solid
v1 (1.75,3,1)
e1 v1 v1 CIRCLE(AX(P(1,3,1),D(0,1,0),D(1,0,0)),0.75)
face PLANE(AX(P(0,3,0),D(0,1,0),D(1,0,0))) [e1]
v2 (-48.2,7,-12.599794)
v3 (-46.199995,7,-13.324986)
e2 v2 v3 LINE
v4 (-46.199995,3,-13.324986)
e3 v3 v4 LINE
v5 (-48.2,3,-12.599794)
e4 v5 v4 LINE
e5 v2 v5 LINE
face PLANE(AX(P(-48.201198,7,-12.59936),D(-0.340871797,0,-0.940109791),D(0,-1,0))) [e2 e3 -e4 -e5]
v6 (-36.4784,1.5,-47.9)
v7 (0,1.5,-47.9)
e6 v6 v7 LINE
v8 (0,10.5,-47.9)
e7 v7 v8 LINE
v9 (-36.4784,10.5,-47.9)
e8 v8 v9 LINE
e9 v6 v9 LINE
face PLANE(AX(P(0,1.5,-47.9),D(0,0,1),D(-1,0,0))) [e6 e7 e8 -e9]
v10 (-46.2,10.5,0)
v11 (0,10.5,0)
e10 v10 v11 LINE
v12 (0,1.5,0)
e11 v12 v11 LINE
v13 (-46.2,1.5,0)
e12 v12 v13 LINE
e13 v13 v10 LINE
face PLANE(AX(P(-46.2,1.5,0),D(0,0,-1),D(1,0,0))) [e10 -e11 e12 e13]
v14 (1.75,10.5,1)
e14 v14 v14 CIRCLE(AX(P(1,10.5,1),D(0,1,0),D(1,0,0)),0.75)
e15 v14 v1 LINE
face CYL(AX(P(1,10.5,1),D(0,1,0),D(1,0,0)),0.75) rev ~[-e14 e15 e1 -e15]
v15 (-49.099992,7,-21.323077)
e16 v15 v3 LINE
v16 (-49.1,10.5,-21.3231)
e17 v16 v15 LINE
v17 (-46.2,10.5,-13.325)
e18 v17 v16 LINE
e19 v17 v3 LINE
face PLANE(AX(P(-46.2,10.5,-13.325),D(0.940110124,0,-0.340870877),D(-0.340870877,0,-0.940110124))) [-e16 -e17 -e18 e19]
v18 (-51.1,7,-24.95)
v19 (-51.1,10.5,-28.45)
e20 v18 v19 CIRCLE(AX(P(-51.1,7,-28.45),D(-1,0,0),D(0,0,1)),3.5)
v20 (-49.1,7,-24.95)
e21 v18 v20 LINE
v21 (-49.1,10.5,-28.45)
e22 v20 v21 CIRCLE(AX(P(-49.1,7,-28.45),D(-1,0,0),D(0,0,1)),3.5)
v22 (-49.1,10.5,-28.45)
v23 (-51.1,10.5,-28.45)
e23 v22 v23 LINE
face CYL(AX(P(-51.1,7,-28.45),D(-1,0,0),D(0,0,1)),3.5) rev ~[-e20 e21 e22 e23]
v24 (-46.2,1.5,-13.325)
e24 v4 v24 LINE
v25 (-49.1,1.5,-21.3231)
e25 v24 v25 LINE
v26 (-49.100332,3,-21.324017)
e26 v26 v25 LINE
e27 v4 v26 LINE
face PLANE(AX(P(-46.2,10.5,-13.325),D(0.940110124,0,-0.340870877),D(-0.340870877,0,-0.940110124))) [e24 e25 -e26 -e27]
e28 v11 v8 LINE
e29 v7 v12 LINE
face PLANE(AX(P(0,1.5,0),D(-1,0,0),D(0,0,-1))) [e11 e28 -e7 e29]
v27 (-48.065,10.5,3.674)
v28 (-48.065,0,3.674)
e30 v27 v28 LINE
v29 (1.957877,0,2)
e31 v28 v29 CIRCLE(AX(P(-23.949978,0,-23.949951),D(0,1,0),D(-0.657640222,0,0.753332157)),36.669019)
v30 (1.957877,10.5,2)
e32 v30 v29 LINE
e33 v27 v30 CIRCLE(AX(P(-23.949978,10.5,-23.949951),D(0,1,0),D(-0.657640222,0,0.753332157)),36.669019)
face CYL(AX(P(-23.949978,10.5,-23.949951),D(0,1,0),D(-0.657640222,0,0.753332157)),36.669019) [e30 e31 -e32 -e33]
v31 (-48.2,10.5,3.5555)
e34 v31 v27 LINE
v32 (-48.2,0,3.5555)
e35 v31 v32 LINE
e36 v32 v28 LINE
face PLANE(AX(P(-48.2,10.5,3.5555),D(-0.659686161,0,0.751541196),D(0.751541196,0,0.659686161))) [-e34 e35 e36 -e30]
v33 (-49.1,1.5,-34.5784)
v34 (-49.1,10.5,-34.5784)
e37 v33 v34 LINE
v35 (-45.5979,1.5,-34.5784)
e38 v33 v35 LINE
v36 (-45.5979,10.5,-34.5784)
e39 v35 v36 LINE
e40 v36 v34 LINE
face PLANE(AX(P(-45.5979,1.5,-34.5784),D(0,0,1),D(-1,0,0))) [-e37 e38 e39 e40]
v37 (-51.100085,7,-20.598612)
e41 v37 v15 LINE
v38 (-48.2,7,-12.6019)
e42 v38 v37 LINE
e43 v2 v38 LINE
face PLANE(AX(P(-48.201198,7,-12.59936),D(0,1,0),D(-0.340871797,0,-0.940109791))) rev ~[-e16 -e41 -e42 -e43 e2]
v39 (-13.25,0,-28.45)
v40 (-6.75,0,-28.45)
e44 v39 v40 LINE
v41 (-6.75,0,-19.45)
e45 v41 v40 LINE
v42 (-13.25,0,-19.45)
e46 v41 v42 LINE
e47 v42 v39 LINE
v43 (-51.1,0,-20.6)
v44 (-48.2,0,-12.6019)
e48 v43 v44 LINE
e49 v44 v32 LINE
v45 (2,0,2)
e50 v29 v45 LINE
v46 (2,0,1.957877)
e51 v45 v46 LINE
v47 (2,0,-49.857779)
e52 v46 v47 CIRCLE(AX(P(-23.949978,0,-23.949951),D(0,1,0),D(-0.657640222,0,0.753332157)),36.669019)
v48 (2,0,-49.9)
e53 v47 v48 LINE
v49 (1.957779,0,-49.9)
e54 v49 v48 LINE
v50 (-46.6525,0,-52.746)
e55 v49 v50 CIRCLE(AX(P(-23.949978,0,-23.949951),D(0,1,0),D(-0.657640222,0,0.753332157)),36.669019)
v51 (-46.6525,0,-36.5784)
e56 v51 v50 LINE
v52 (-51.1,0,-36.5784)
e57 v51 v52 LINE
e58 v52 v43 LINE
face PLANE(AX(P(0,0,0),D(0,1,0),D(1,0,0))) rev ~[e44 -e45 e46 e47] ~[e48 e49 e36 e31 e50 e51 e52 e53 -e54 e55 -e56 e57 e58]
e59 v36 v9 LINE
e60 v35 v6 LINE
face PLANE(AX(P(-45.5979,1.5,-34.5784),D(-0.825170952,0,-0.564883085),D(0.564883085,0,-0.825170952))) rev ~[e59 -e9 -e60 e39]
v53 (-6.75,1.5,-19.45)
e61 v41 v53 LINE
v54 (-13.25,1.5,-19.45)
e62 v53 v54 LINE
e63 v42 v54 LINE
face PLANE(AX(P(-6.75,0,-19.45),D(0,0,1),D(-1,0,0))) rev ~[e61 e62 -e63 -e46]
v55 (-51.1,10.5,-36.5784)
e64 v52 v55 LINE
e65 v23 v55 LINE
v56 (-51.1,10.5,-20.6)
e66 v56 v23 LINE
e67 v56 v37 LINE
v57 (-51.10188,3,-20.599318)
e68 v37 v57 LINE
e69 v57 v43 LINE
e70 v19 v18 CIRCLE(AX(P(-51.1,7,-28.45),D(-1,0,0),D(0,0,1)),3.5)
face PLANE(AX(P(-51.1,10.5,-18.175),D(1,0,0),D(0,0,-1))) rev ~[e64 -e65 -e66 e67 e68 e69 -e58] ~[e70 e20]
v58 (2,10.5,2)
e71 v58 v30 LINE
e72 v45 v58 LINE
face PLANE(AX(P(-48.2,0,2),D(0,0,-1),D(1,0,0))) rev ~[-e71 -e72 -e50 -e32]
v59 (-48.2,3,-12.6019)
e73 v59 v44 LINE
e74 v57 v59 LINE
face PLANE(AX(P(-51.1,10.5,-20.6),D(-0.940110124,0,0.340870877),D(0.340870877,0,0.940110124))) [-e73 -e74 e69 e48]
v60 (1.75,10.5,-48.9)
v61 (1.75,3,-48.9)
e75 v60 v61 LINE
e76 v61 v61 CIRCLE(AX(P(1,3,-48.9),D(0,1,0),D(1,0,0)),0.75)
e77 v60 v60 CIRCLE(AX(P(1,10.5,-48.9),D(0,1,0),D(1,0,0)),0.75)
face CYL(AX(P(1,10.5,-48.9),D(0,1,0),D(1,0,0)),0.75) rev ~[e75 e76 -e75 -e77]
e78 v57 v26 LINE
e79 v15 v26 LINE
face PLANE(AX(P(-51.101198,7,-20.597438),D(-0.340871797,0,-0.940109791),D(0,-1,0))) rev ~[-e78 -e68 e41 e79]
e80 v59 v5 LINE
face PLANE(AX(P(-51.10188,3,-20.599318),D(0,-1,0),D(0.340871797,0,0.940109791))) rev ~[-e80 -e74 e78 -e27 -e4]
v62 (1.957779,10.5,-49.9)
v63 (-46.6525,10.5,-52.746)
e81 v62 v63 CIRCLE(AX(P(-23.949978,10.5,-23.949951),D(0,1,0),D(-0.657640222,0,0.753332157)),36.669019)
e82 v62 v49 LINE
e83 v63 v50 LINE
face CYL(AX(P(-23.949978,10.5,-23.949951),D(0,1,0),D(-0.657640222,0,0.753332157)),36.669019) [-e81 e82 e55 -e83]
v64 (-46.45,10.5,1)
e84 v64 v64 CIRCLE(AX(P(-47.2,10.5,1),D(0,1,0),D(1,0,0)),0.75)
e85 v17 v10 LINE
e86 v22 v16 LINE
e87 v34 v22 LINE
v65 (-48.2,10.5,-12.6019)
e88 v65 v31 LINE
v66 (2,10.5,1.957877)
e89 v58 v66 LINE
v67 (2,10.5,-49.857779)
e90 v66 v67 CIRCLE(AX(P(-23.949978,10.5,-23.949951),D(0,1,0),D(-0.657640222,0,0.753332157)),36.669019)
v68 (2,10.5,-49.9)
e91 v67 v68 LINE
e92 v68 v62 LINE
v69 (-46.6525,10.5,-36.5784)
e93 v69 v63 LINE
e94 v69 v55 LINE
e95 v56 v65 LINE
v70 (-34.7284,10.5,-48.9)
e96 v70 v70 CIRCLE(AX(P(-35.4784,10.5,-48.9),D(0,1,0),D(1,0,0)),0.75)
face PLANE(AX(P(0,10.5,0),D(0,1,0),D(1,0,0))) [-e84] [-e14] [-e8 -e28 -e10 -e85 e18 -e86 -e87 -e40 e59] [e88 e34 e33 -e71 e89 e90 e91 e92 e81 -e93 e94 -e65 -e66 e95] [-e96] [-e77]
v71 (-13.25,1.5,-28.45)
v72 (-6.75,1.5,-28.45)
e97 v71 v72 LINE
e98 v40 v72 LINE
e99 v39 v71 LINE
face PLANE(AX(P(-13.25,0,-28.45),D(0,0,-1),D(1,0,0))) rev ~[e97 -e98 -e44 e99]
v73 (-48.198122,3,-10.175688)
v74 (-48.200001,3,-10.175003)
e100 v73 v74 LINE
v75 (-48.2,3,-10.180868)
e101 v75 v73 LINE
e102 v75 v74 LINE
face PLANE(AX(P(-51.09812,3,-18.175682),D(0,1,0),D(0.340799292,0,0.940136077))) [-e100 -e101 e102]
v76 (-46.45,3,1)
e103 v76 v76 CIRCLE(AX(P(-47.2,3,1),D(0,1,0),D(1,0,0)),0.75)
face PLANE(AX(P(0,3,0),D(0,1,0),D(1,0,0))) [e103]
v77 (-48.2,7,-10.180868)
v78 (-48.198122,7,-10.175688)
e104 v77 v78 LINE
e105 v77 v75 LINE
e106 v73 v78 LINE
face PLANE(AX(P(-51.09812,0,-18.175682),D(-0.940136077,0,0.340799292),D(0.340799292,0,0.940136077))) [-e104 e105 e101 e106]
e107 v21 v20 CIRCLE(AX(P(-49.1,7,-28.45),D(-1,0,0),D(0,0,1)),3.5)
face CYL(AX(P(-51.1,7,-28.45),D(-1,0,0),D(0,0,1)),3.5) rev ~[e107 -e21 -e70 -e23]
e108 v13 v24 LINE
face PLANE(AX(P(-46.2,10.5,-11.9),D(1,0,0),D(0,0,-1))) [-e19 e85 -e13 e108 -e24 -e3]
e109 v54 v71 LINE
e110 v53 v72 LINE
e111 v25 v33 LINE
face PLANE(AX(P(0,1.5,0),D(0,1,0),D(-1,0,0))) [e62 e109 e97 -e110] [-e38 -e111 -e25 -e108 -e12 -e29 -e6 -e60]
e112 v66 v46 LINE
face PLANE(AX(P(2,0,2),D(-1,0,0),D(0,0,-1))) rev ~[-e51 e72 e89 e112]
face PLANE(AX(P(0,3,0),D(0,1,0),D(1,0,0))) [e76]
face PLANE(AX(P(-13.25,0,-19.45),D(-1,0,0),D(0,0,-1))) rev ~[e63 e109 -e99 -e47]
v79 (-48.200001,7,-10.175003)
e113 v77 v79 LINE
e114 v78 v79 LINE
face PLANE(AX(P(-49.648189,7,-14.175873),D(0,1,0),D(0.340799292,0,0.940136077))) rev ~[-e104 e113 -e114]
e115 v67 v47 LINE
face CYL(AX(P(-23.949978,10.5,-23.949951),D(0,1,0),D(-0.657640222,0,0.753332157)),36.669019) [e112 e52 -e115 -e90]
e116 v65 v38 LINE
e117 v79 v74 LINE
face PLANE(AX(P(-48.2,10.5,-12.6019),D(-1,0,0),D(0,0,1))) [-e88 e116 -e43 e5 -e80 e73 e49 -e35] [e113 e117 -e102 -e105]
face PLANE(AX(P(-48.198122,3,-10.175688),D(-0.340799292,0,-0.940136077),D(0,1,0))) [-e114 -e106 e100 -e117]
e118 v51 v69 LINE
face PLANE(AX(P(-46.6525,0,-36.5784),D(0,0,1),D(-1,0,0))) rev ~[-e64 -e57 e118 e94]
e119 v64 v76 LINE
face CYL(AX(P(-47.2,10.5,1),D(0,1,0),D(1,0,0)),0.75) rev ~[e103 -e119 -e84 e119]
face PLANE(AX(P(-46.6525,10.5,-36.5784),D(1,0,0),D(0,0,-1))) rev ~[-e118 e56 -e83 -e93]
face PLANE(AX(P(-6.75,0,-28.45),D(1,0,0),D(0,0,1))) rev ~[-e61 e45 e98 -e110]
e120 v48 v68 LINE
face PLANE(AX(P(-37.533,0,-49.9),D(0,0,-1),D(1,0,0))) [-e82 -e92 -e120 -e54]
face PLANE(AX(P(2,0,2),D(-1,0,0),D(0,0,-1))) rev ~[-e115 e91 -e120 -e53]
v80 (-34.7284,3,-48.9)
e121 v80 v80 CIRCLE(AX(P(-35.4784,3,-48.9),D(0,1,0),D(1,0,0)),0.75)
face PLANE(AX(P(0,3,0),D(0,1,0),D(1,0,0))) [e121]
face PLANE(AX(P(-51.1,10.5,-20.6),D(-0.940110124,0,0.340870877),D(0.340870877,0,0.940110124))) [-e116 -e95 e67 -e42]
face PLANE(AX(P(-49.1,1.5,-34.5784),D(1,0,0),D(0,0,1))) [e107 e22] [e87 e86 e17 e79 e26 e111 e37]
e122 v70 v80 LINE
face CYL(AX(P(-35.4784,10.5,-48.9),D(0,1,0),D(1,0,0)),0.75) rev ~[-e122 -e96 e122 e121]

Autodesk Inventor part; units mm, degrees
ref_plane "YZ Plane" through (0, 0, 0) normal (1, 0, 0) x (0, 1, 0)
ref_plane "XZ Plane" through (0, 0, 0) normal (0, 1, 0) x (-1, 0, 0)
ref_plane "XY Plane" through (0, 0, 0) normal (0, 0, 1) x (1, 0, 0)
sketch "Sketch1" plane through (0, 0, 0) normal (0, 1, 0) x (-1, 0, 0)
  line L0 (0, 0) -> (49.1, 0)
  line L1 (49.1, -47.9) -> (0, -47.9)
  line L2 (0, -47.9) -> (0, 0)
  line L3 (46.7, -10.9) -> (49.1, -18.9)
  line L4 (46.7, -10.9) -> (46.7, 0)
  line L5 (49.1, 0) -> (46.7, 0)
  line L6 (49.1, -18.9) -> (49.1, -47.9)
  dimension "d0" = 49.1
  dimension "d1" = 47.9
  dimension "d2" = 18.9
extrude "Extrusion1" add sketch "Sketch1" along normal blind 1.5
sketch "Sketch2" plane through (0, 1.5, 0) normal (0, 1, 0) x (1, 0, 0)
  line L0 (-49.1, 18.9) -> (-46.7, 10.9) projected
  line L1 (-46.2, 10.9) -> (-46.2, 0)
  line L2 (-46.2, 0) -> (-46.7, 0)
  line L3 (-46.7, 10.9) -> (-46.7, 0) projected
  line L4 (-46.7, 0) -> (-46.7, 10.9)
  line L5 (-49.1, 47.9) -> (-49.1, 18.9) projected
  line L6 (-46.7, 10.9) -> (-49.1, 18.9)
  line L7 (-49.1, 18.9) -> (-46.2, 10.9)
  point P0 (0, 0)
extrude "Extrusion2" cut sketch "Sketch2" against normal blind 10
sketch "Sketch3" plane through (0, 1.5, 0) normal (0, 1, 0) x (1, 0, 0)
  line L0 (-49.1, 47.9) -> (-49.1, 18.9) projected
  line L1 (-49.1, 34.5784) -> (-45.5979, 34.5784)
  line L2 (-45.5979, 34.5784) -> (-36.4784, 47.9)
  line L3 (0, 47.9) -> (-49.1, 47.9) projected
  line L4 (-49.1, 47.9) -> (-36.4784, 47.9)
  line L5 (-49.1, 47.9) -> (-49.1, 34.5784)
  point P0 (0, 0)
extrude "Extrusion3" cut sketch "Sketch3" against normal blind 10
sketch "Sketch4" plane through (0, 1.5, 0) normal (0, 1, 0) x (1, 0, 0)
  line L0 (-46.2, 10.9) -> (-49.1, 18.9) projected
  line L1 (-46.2, 0) -> (0, 0) projected
  line L2 (-46.2, -2) -> (0, -2)
  line L3 (0, -2) -> (2, -2)
  line L4 (2, -2) -> (2, 47.9)
  line L5 (0, 47.9) -> (-36.4784, 47.9) projected
  line L6 (2, 47.9) -> (2, 49.9)
  line L7 (2, 49.9) -> (-36.4784, 49.9)
  line L8 (-38.1287, 49.0298) -> (-37.533, 49.9)
  line L9 (-37.533, 49.9) -> (-36.4784, 49.9)
  line L10 (-45.5979, 34.5784) -> (-36.4784, 47.9) projected
  line L11 (-49.1, 36.5784) -> (-46.6525, 36.5784)
  line L12 (-46.6525, 36.5784) -> (-37.533, 49.9)
  line L13 (-46.2, -2) -> (-48.2, -2)
  line L14 (-48.2, -2) -> (-48.2, 10.9)
  line L15 (-51.1, 18.9) -> (-48.2, 10.9)
  line L16 (-49.1, 36.5784) -> (-51.1, 36.5784)
  line L17 (-51.1, 36.5784) -> (-51.1, 18.9)
  line L18 (0, 0) -> (0, 47.9) projected
  line L19 (0, 0) -> (0, 47.9)
  line L20 (0, 47.9) -> (-36.4784, 47.9)
  line L21 (-36.4784, 47.9) -> (-45.5979, 34.5784)
  line L22 (-45.5979, 34.5784) -> (-49.1, 34.5784) projected
  line L23 (-49.1, 34.5784) -> (-45.5979, 34.5784)
  line L24 (-49.1, 34.5784) -> (-49.1, 18.9) projected
  line L25 (-49.1, 34.5784) -> (-49.1, 18.9)
  line L26 (-49.1, 18.9) -> (-46.2, 10.9)
  line L27 (-46.2, 0) -> (-46.2, 10.9)
  line L28 (-46.2, 0) -> (0, 0)
  dimension "d16" = 2
  dimension "d17" = 2
  dimension "d18" = 2
  dimension "d23" = 2
extrude "Extrusion4" add sketch "Sketch4" along normal blind 9
sketch "Sketch5" plane through (0, 0, 0) normal (0, -1, 0) x (1, 0, 0)
  line L0 (-46.2, 0) -> (0, 0) projected
  line L1 (0, 0) -> (-46.2, 0)
  line L2 (-46.2, 0) -> (-46.2, -10.9) projected
  line L3 (-46.2, 0) -> (-46.2, -10.9)
  line L4 (-46.2, -10.9) -> (-49.1, -18.9) projected
  line L5 (-46.2, -10.9) -> (-49.1, -18.9)
  line L6 (-49.1, -18.9) -> (-49.1, -34.5784) projected
  line L7 (-49.1, -18.9) -> (-49.1, -34.5784)
  line L8 (-49.1, -34.5784) -> (-45.5979, -34.5784) projected
  line L9 (-49.1, -34.5784) -> (-45.5979, -34.5784)
  line L10 (-36.4784, -47.9) -> (-45.5979, -34.5784) projected
  line L11 (-45.5979, -34.5784) -> (-36.4784, -47.9)
  line L12 (-36.4784, -47.9) -> (0, -47.9) projected
  line L13 (-36.4784, -47.9) -> (0, -47.9)
  line L14 (0, -47.9) -> (0, 0)
  line L15 (-48.2, 2) -> (2, 2) projected
  line L16 (2, 2) -> (-48.2, 2)
  line L17 (-51.1, -18.9) -> (-48.2, -10.9) projected
  line L18 (-48.2, 2) -> (-48.2, -10.9)
  line L19 (-48.2, -10.9) -> (-51.1, -18.9)
  line L20 (-51.1, -18.9) -> (-51.1, -36.5784)
  line L21 (-46.6525, -36.5784) -> (-51.1, -36.5784) projected
  line L22 (-51.1, -36.5784) -> (-46.6525, -36.5784)
  line L23 (-37.533, -49.9) -> (-46.6525, -36.5784) projected
  line L24 (-46.6525, -36.5784) -> (-37.533, -49.9)
  line L25 (2, 2) -> (2, -49.9) projected
  line L26 (-37.533, -49.9) -> (2, -49.9)
  line L27 (2, -49.9) -> (2, 2)
extrude "Extrusion5" add sketch "Sketch5" against normal blind 1.5
sketch "Sketch6" plane through (0, 10.5, 0) normal (0, 1, 0) x (1, 0, 0)
  line L0 (-48.2, -2) -> (2, -2) projected
  circle A0 centre (1, -1) radius 0.75
  line L1 (-46.2, 0) -> (-46.2, 10.9) projected
  circle A1 centre (-47.2, -1) radius 0.75
  point P0 (0, 0)
  dimension "d35" = 1.5
sketch "Sketch7" plane through (0, 10.5, 0) normal (0, 1, 0) x (1, 0, 0)
  point P0 (0, 0)
extrude "Extrusion6" cut sketch "Sketch6" against normal blind 7.5
sketch "Sketch8" plane through (0, 10.5, 0) normal (0, 1, 0) x (1, 0, 0)
  line L0 (-45.5979, 34.5784) -> (-36.4784, 47.9) projected
  circle A0 centre (-35.4784, 48.9) radius 0.75
  circle A1 centre (1, 48.9) radius 0.75
  point P0 (0, 0)
  dimension "d40" = 1.5
  dimension "d43" = 1.5
extrude "Extrusion7" cut sketch "Sketch8" against normal blind 7.5
sketch "Sketch9" plane through (0, 0, 0) normal (0, -1, 0) x (1, 0, 0)
  line L0 (-48.2, 2) -> (2, 2) projected
  line L1 (2, 2) -> (2, -49.9) projected
  line L2 (-6.75, -23.95) -> (-6.75, -19.45)
  line L3 (-6.75, -19.45) -> (-13.25, -19.45)
  line L4 (-13.25, -19.45) -> (-13.25, -28.45)
  line L5 (-13.25, -28.45) -> (-6.75, -28.45)
  line L6 (-6.75, -28.45) -> (-6.75, -23.95)
  point P0 (0, 0)
  dimension "d51" = 6.5
  dimension "d52" = 9
extrude "Extrusion8" cut sketch "Sketch9" against normal blind 1.5
sketch "Sketch10" plane through (0, 10.5, 0) normal (0, 1, 0) x (1, 0, 0)
  line L0 (-49.1, 18.9) -> (-46.2, 10.9) projected
  line L1 (-48.2, -2) -> (-48.2, 10.9) projected
  line L2 (-48.2, 10.9) -> (-51.1, 18.9) projected
  line L3 (-48.2, 10.175) -> (-48.2, 10.9)
  line L4 (-51.1, 18.9) -> (-51.1, 36.5784) projected
  line L5 (-51.1, 18.175) -> (-51.1, 18.9)
  line L6 (-51.1, 18.175) -> (-48.2, 10.175)
  line L7 (-48.2, 10.9) -> (-51.1, 18.9)
  point P0 (0, 0)
extrude "Extrusion9" add sketch "Sketch10" against normal blind 10.5
sketch "Sketch11" plane through (-51.1, 0, -18.175) normal (-0.9401361, 0, 0.3407993) x (0.3407993, 0, 0.9401361)
  point P0 (34.5018, 0)
sketch "Sketch12" plane through (-51.1, 0, -18.175) normal (-0.9401361, 0, 0.3407993) x (0.3407993, 0, 0.9401361)
  line L0 (0, 10.5) -> (0, 0) projected
  line L1 (5.4546, 0) -> (3.2394, 0) projected
  line L2 (4.2545, 0) -> (7.2545, 0) construction
  line L3 (4.2545, 7) -> (0, 7)
  line L4 (0, 7) -> (0, 3)
  line L5 (0, 3) -> (8.5094, 3)
  line L6 (8.5094, 1.5) -> (8.5094, 10.5) projected
  line L7 (4.2545, 7) -> (8.5094, 7)
  line L8 (8.5094, 10.5) -> (8.5094, 0) projected
  line L9 (8.5094, 3) -> (8.5094, 7)
  line L10 (0, 10.5) -> (8.5094, 10.5) projected
  line L11 (0, 10.5) -> (0, 0) projected
  line L12 (8.5094, 0) -> (0, 0) projected
  line L13 (8.5094, 10.5) -> (8.5094, 0) projected
  point P0 (34.5018, 0)
  dimension "d58" = 4.2545
extrude "Extrusion10" cut sketch "Sketch12" along normal blind 5 contours L3 L7 L6 L5 L0
sketch "Sketch14" plane through (0, 10.5, 0) normal (0, 1, 0) x (1, 0, 0)
  point P0 (0, 0)
sketch "Sketch15" plane through (0, 10.5, 0) normal (0, 1, 0) x (1, 0, 0)
  line L0 (-46.2, 0) -> (-46.2, 10.9) projected
  line L1 (-46.2, 10.9) -> (-46.2, 11.9)
  line L2 (-46.2, 11.9) -> (-49.1, 19.8981)
  line L3 (-49.1, 34.5784) -> (-49.1, 18.9) projected
  line L4 (-46.2, 11.9) -> (-37.6924, 11.9) construction
  line L5 (-49.1, 19.8981) -> (-49.1, 18.9)
  line L6 (-49.1, 18.9) -> (-46.2, 10.9) projected
  line L7 (-49.1, 18.9) -> (-46.2, 10.9)
  point P0 (0, 0)
  dimension "d71" = 1
  dimension "d72" = 109.93
extrude "Extrusion12" add sketch "Sketch15" against normal blind 9
sketch "Sketch16" plane through (0, 10.5, 0) normal (0, 1, 0) x (1, 0, 0)
  line L0 (-51.1, 18.175) -> (-48.2, 10.175) projected
  line L1 (-51.1, 18.175) -> (-51.1, 19.175)
  line L2 (-51.1, 36.5784) -> (-51.1, 18.175) projected
  line L3 (-51.1, 19.175) -> (-48.2, 11.1769)
  line L4 (-51.1, 19.175) -> (-42.5924, 19.175) construction
  line L5 (-48.2, 11.1769) -> (-48.2, 10.175)
  line L6 (-48.2, 10.175) -> (-48.2, -2) projected
  line L7 (-51.1, 18.175) -> (-48.2, 10.175)
  point P0 (0, 0)
  dimension "d75" = 1
  dimension "d76" = 70.07
extrude "Extrusion13" cut sketch "Sketch16" against normal blind 10.5
sketch "Sketch17" plane through (-51.1, 0, -36.5784) normal (-1, 0, 0) x (0, 0, 1)
  line L0 (-13.3216, 0) -> (-13.3216, 10.5) projected
  line L1 (36.8284, 10.5) -> (36.8284, 3) projected
  line L2 (38.5784, 0) -> (38.5784, 10.5) projected
  line L3 (15.9784, 5.25) -> (15.9784, 10.5) construction
  line L4 (16.6804, 10.5) -> (2, 10.5) projected
  point P0 (36.5784, 0)
sketch "Sketch18" plane through (0, 10.5, 0) normal (0, 1, 0) x (1, 0, 0)
  line L0 (-51.1, 19.175) -> (-51.1, 36.5784) projected
  line L1 (-51.1, 19.175) -> (-51.1, 20.6)
  line L2 (-51.1, 20.6) -> (-48.2, 12.6019)
  line L3 (-51.1, 20.6) -> (-42.5924, 20.6) construction
  line L4 (-51.1, 19.175) -> (-48.2, 11.1769) projected
  line L5 (-48.2, 12.6019) -> (-48.2, 11.1769)
  line L6 (-51.1, 19.175) -> (-48.2, 11.1769)
  point P0 (0, 0)
  dimension "d82" = 1.425
  dimension "d83" = 70.07
extrude "Extrusion14" cut sketch "Sketch18" against normal blind 10.5
sketch "Sketch19" plane through (0, 10.5, 0) normal (0, 1, 0) x (1, 0, 0)
  line L0 (-46.2, 11.9) -> (-49.1, 19.8981) projected
  line L1 (-46.2, 11.9) -> (-46.2, 13.325)
  line L2 (-46.2, 13.325) -> (-49.1, 21.3231)
  line L3 (-49.1, 19.8981) -> (-49.1, 34.5784) projected
  line L4 (-49.1, 21.3231) -> (-49.1, 19.8981)
  line L5 (-49.1, 19.8981) -> (-46.2, 11.9)
  point P0 (0, 0)
  dimension "d86" = 1.425
  dimension "d87" = 160.07
extrude "Extrusion15" add sketch "Sketch19" against normal blind 9
sketch "Sketch20" plane through (-51.1, 0, -20.6) normal (-0.9401098, 0, 0.3408718) x (0.3408718, 0, 0.9401098)
  line L0 (0, 3) -> (8.5096, 3)
  line L1 (8.5096, 10.5) -> (8.5096, 1.5) projected
  line L2 (8.5096, 3) -> (8.5096, 7)
  line L3 (8.5096, 7) -> (0.002, 7)
  line L4 (0.002, 10.5) -> (0.002, 1.5) projected
  line L5 (0, 3) -> (0.002, 7)
  point P0 (36.7848, 0)
  point P1 (0, 0)
  point P2 (8.5096, 7)
  dimension "d90" = 3
  dimension "d91" = 4
extrude "Extrusion16" cut sketch "Sketch20" against normal blind 10
sketch "Sketch21" plane through (-51.1, 0, -36.5784) normal (-1, 0, 0) x (0, 0, 1)
  point P0 (36.5784, 0)
sketch "Sketch22" plane through (-51.1, 0, -36.5784) normal (-1, 0, 0) x (0, 0, 1)
  line L0 (15.9784, 0) -> (0, 0) projected
  line L1 (17.1284, 0) -> (8.1284, 0) projected
  circle A0 centre (8.1284, 7) radius 3.5
  point P0 (36.5784, 0)
  dimension "d98" = 7
extrude "Extrusion17" cut sketch "Sketch22" against normal blind 10
sketch "Sketch23" plane through (0, 10.5, 0) normal (0, 1, 0) x (1, 0, 0)
  line L0 (2, -2) -> (2, 49.9) projected
  line L1 (2, 23.95) -> (-23.95, 23.95)
  arc A0 (-48.065, -3.674) -> (-46.6525, 52.746) centre (-23.95, 23.95) ccw
  line L2 (2, -2) -> (-48.2, -2) projected
  line L3 (-48.2, -2) -> (-48.2, -3.5555)
  line L4 (-48.2, -3.5555) -> (-48.065, -3.674)
  line L5 (-46.6525, 36.5784) -> (-46.6525, 52.746)
  line L6 (-48.2, -2) -> (2, -2)
  line L7 (2, -2) -> (2, 49.9)
  line L8 (2, 49.9) -> (-37.533, 49.9)
  line L9 (-37.533, 49.9) -> (-46.6525, 36.5784)
  point P0 (0, 0)
  point P1 (1.9578, 49.9)
  point P2 (2, -1.9578)
  point P3 (2, 49.8578)
  point P4 (1.9578, -2)
  dimension "d114" = 25.95
  dimension "d115" = 36.669
extrude "Extrusion18" add sketch "Sketch23" against normal blind 10.5 contours A0 L4 L3 L2 | L8 L9 L5 A0 | L0 A0
properties part number "Case"
